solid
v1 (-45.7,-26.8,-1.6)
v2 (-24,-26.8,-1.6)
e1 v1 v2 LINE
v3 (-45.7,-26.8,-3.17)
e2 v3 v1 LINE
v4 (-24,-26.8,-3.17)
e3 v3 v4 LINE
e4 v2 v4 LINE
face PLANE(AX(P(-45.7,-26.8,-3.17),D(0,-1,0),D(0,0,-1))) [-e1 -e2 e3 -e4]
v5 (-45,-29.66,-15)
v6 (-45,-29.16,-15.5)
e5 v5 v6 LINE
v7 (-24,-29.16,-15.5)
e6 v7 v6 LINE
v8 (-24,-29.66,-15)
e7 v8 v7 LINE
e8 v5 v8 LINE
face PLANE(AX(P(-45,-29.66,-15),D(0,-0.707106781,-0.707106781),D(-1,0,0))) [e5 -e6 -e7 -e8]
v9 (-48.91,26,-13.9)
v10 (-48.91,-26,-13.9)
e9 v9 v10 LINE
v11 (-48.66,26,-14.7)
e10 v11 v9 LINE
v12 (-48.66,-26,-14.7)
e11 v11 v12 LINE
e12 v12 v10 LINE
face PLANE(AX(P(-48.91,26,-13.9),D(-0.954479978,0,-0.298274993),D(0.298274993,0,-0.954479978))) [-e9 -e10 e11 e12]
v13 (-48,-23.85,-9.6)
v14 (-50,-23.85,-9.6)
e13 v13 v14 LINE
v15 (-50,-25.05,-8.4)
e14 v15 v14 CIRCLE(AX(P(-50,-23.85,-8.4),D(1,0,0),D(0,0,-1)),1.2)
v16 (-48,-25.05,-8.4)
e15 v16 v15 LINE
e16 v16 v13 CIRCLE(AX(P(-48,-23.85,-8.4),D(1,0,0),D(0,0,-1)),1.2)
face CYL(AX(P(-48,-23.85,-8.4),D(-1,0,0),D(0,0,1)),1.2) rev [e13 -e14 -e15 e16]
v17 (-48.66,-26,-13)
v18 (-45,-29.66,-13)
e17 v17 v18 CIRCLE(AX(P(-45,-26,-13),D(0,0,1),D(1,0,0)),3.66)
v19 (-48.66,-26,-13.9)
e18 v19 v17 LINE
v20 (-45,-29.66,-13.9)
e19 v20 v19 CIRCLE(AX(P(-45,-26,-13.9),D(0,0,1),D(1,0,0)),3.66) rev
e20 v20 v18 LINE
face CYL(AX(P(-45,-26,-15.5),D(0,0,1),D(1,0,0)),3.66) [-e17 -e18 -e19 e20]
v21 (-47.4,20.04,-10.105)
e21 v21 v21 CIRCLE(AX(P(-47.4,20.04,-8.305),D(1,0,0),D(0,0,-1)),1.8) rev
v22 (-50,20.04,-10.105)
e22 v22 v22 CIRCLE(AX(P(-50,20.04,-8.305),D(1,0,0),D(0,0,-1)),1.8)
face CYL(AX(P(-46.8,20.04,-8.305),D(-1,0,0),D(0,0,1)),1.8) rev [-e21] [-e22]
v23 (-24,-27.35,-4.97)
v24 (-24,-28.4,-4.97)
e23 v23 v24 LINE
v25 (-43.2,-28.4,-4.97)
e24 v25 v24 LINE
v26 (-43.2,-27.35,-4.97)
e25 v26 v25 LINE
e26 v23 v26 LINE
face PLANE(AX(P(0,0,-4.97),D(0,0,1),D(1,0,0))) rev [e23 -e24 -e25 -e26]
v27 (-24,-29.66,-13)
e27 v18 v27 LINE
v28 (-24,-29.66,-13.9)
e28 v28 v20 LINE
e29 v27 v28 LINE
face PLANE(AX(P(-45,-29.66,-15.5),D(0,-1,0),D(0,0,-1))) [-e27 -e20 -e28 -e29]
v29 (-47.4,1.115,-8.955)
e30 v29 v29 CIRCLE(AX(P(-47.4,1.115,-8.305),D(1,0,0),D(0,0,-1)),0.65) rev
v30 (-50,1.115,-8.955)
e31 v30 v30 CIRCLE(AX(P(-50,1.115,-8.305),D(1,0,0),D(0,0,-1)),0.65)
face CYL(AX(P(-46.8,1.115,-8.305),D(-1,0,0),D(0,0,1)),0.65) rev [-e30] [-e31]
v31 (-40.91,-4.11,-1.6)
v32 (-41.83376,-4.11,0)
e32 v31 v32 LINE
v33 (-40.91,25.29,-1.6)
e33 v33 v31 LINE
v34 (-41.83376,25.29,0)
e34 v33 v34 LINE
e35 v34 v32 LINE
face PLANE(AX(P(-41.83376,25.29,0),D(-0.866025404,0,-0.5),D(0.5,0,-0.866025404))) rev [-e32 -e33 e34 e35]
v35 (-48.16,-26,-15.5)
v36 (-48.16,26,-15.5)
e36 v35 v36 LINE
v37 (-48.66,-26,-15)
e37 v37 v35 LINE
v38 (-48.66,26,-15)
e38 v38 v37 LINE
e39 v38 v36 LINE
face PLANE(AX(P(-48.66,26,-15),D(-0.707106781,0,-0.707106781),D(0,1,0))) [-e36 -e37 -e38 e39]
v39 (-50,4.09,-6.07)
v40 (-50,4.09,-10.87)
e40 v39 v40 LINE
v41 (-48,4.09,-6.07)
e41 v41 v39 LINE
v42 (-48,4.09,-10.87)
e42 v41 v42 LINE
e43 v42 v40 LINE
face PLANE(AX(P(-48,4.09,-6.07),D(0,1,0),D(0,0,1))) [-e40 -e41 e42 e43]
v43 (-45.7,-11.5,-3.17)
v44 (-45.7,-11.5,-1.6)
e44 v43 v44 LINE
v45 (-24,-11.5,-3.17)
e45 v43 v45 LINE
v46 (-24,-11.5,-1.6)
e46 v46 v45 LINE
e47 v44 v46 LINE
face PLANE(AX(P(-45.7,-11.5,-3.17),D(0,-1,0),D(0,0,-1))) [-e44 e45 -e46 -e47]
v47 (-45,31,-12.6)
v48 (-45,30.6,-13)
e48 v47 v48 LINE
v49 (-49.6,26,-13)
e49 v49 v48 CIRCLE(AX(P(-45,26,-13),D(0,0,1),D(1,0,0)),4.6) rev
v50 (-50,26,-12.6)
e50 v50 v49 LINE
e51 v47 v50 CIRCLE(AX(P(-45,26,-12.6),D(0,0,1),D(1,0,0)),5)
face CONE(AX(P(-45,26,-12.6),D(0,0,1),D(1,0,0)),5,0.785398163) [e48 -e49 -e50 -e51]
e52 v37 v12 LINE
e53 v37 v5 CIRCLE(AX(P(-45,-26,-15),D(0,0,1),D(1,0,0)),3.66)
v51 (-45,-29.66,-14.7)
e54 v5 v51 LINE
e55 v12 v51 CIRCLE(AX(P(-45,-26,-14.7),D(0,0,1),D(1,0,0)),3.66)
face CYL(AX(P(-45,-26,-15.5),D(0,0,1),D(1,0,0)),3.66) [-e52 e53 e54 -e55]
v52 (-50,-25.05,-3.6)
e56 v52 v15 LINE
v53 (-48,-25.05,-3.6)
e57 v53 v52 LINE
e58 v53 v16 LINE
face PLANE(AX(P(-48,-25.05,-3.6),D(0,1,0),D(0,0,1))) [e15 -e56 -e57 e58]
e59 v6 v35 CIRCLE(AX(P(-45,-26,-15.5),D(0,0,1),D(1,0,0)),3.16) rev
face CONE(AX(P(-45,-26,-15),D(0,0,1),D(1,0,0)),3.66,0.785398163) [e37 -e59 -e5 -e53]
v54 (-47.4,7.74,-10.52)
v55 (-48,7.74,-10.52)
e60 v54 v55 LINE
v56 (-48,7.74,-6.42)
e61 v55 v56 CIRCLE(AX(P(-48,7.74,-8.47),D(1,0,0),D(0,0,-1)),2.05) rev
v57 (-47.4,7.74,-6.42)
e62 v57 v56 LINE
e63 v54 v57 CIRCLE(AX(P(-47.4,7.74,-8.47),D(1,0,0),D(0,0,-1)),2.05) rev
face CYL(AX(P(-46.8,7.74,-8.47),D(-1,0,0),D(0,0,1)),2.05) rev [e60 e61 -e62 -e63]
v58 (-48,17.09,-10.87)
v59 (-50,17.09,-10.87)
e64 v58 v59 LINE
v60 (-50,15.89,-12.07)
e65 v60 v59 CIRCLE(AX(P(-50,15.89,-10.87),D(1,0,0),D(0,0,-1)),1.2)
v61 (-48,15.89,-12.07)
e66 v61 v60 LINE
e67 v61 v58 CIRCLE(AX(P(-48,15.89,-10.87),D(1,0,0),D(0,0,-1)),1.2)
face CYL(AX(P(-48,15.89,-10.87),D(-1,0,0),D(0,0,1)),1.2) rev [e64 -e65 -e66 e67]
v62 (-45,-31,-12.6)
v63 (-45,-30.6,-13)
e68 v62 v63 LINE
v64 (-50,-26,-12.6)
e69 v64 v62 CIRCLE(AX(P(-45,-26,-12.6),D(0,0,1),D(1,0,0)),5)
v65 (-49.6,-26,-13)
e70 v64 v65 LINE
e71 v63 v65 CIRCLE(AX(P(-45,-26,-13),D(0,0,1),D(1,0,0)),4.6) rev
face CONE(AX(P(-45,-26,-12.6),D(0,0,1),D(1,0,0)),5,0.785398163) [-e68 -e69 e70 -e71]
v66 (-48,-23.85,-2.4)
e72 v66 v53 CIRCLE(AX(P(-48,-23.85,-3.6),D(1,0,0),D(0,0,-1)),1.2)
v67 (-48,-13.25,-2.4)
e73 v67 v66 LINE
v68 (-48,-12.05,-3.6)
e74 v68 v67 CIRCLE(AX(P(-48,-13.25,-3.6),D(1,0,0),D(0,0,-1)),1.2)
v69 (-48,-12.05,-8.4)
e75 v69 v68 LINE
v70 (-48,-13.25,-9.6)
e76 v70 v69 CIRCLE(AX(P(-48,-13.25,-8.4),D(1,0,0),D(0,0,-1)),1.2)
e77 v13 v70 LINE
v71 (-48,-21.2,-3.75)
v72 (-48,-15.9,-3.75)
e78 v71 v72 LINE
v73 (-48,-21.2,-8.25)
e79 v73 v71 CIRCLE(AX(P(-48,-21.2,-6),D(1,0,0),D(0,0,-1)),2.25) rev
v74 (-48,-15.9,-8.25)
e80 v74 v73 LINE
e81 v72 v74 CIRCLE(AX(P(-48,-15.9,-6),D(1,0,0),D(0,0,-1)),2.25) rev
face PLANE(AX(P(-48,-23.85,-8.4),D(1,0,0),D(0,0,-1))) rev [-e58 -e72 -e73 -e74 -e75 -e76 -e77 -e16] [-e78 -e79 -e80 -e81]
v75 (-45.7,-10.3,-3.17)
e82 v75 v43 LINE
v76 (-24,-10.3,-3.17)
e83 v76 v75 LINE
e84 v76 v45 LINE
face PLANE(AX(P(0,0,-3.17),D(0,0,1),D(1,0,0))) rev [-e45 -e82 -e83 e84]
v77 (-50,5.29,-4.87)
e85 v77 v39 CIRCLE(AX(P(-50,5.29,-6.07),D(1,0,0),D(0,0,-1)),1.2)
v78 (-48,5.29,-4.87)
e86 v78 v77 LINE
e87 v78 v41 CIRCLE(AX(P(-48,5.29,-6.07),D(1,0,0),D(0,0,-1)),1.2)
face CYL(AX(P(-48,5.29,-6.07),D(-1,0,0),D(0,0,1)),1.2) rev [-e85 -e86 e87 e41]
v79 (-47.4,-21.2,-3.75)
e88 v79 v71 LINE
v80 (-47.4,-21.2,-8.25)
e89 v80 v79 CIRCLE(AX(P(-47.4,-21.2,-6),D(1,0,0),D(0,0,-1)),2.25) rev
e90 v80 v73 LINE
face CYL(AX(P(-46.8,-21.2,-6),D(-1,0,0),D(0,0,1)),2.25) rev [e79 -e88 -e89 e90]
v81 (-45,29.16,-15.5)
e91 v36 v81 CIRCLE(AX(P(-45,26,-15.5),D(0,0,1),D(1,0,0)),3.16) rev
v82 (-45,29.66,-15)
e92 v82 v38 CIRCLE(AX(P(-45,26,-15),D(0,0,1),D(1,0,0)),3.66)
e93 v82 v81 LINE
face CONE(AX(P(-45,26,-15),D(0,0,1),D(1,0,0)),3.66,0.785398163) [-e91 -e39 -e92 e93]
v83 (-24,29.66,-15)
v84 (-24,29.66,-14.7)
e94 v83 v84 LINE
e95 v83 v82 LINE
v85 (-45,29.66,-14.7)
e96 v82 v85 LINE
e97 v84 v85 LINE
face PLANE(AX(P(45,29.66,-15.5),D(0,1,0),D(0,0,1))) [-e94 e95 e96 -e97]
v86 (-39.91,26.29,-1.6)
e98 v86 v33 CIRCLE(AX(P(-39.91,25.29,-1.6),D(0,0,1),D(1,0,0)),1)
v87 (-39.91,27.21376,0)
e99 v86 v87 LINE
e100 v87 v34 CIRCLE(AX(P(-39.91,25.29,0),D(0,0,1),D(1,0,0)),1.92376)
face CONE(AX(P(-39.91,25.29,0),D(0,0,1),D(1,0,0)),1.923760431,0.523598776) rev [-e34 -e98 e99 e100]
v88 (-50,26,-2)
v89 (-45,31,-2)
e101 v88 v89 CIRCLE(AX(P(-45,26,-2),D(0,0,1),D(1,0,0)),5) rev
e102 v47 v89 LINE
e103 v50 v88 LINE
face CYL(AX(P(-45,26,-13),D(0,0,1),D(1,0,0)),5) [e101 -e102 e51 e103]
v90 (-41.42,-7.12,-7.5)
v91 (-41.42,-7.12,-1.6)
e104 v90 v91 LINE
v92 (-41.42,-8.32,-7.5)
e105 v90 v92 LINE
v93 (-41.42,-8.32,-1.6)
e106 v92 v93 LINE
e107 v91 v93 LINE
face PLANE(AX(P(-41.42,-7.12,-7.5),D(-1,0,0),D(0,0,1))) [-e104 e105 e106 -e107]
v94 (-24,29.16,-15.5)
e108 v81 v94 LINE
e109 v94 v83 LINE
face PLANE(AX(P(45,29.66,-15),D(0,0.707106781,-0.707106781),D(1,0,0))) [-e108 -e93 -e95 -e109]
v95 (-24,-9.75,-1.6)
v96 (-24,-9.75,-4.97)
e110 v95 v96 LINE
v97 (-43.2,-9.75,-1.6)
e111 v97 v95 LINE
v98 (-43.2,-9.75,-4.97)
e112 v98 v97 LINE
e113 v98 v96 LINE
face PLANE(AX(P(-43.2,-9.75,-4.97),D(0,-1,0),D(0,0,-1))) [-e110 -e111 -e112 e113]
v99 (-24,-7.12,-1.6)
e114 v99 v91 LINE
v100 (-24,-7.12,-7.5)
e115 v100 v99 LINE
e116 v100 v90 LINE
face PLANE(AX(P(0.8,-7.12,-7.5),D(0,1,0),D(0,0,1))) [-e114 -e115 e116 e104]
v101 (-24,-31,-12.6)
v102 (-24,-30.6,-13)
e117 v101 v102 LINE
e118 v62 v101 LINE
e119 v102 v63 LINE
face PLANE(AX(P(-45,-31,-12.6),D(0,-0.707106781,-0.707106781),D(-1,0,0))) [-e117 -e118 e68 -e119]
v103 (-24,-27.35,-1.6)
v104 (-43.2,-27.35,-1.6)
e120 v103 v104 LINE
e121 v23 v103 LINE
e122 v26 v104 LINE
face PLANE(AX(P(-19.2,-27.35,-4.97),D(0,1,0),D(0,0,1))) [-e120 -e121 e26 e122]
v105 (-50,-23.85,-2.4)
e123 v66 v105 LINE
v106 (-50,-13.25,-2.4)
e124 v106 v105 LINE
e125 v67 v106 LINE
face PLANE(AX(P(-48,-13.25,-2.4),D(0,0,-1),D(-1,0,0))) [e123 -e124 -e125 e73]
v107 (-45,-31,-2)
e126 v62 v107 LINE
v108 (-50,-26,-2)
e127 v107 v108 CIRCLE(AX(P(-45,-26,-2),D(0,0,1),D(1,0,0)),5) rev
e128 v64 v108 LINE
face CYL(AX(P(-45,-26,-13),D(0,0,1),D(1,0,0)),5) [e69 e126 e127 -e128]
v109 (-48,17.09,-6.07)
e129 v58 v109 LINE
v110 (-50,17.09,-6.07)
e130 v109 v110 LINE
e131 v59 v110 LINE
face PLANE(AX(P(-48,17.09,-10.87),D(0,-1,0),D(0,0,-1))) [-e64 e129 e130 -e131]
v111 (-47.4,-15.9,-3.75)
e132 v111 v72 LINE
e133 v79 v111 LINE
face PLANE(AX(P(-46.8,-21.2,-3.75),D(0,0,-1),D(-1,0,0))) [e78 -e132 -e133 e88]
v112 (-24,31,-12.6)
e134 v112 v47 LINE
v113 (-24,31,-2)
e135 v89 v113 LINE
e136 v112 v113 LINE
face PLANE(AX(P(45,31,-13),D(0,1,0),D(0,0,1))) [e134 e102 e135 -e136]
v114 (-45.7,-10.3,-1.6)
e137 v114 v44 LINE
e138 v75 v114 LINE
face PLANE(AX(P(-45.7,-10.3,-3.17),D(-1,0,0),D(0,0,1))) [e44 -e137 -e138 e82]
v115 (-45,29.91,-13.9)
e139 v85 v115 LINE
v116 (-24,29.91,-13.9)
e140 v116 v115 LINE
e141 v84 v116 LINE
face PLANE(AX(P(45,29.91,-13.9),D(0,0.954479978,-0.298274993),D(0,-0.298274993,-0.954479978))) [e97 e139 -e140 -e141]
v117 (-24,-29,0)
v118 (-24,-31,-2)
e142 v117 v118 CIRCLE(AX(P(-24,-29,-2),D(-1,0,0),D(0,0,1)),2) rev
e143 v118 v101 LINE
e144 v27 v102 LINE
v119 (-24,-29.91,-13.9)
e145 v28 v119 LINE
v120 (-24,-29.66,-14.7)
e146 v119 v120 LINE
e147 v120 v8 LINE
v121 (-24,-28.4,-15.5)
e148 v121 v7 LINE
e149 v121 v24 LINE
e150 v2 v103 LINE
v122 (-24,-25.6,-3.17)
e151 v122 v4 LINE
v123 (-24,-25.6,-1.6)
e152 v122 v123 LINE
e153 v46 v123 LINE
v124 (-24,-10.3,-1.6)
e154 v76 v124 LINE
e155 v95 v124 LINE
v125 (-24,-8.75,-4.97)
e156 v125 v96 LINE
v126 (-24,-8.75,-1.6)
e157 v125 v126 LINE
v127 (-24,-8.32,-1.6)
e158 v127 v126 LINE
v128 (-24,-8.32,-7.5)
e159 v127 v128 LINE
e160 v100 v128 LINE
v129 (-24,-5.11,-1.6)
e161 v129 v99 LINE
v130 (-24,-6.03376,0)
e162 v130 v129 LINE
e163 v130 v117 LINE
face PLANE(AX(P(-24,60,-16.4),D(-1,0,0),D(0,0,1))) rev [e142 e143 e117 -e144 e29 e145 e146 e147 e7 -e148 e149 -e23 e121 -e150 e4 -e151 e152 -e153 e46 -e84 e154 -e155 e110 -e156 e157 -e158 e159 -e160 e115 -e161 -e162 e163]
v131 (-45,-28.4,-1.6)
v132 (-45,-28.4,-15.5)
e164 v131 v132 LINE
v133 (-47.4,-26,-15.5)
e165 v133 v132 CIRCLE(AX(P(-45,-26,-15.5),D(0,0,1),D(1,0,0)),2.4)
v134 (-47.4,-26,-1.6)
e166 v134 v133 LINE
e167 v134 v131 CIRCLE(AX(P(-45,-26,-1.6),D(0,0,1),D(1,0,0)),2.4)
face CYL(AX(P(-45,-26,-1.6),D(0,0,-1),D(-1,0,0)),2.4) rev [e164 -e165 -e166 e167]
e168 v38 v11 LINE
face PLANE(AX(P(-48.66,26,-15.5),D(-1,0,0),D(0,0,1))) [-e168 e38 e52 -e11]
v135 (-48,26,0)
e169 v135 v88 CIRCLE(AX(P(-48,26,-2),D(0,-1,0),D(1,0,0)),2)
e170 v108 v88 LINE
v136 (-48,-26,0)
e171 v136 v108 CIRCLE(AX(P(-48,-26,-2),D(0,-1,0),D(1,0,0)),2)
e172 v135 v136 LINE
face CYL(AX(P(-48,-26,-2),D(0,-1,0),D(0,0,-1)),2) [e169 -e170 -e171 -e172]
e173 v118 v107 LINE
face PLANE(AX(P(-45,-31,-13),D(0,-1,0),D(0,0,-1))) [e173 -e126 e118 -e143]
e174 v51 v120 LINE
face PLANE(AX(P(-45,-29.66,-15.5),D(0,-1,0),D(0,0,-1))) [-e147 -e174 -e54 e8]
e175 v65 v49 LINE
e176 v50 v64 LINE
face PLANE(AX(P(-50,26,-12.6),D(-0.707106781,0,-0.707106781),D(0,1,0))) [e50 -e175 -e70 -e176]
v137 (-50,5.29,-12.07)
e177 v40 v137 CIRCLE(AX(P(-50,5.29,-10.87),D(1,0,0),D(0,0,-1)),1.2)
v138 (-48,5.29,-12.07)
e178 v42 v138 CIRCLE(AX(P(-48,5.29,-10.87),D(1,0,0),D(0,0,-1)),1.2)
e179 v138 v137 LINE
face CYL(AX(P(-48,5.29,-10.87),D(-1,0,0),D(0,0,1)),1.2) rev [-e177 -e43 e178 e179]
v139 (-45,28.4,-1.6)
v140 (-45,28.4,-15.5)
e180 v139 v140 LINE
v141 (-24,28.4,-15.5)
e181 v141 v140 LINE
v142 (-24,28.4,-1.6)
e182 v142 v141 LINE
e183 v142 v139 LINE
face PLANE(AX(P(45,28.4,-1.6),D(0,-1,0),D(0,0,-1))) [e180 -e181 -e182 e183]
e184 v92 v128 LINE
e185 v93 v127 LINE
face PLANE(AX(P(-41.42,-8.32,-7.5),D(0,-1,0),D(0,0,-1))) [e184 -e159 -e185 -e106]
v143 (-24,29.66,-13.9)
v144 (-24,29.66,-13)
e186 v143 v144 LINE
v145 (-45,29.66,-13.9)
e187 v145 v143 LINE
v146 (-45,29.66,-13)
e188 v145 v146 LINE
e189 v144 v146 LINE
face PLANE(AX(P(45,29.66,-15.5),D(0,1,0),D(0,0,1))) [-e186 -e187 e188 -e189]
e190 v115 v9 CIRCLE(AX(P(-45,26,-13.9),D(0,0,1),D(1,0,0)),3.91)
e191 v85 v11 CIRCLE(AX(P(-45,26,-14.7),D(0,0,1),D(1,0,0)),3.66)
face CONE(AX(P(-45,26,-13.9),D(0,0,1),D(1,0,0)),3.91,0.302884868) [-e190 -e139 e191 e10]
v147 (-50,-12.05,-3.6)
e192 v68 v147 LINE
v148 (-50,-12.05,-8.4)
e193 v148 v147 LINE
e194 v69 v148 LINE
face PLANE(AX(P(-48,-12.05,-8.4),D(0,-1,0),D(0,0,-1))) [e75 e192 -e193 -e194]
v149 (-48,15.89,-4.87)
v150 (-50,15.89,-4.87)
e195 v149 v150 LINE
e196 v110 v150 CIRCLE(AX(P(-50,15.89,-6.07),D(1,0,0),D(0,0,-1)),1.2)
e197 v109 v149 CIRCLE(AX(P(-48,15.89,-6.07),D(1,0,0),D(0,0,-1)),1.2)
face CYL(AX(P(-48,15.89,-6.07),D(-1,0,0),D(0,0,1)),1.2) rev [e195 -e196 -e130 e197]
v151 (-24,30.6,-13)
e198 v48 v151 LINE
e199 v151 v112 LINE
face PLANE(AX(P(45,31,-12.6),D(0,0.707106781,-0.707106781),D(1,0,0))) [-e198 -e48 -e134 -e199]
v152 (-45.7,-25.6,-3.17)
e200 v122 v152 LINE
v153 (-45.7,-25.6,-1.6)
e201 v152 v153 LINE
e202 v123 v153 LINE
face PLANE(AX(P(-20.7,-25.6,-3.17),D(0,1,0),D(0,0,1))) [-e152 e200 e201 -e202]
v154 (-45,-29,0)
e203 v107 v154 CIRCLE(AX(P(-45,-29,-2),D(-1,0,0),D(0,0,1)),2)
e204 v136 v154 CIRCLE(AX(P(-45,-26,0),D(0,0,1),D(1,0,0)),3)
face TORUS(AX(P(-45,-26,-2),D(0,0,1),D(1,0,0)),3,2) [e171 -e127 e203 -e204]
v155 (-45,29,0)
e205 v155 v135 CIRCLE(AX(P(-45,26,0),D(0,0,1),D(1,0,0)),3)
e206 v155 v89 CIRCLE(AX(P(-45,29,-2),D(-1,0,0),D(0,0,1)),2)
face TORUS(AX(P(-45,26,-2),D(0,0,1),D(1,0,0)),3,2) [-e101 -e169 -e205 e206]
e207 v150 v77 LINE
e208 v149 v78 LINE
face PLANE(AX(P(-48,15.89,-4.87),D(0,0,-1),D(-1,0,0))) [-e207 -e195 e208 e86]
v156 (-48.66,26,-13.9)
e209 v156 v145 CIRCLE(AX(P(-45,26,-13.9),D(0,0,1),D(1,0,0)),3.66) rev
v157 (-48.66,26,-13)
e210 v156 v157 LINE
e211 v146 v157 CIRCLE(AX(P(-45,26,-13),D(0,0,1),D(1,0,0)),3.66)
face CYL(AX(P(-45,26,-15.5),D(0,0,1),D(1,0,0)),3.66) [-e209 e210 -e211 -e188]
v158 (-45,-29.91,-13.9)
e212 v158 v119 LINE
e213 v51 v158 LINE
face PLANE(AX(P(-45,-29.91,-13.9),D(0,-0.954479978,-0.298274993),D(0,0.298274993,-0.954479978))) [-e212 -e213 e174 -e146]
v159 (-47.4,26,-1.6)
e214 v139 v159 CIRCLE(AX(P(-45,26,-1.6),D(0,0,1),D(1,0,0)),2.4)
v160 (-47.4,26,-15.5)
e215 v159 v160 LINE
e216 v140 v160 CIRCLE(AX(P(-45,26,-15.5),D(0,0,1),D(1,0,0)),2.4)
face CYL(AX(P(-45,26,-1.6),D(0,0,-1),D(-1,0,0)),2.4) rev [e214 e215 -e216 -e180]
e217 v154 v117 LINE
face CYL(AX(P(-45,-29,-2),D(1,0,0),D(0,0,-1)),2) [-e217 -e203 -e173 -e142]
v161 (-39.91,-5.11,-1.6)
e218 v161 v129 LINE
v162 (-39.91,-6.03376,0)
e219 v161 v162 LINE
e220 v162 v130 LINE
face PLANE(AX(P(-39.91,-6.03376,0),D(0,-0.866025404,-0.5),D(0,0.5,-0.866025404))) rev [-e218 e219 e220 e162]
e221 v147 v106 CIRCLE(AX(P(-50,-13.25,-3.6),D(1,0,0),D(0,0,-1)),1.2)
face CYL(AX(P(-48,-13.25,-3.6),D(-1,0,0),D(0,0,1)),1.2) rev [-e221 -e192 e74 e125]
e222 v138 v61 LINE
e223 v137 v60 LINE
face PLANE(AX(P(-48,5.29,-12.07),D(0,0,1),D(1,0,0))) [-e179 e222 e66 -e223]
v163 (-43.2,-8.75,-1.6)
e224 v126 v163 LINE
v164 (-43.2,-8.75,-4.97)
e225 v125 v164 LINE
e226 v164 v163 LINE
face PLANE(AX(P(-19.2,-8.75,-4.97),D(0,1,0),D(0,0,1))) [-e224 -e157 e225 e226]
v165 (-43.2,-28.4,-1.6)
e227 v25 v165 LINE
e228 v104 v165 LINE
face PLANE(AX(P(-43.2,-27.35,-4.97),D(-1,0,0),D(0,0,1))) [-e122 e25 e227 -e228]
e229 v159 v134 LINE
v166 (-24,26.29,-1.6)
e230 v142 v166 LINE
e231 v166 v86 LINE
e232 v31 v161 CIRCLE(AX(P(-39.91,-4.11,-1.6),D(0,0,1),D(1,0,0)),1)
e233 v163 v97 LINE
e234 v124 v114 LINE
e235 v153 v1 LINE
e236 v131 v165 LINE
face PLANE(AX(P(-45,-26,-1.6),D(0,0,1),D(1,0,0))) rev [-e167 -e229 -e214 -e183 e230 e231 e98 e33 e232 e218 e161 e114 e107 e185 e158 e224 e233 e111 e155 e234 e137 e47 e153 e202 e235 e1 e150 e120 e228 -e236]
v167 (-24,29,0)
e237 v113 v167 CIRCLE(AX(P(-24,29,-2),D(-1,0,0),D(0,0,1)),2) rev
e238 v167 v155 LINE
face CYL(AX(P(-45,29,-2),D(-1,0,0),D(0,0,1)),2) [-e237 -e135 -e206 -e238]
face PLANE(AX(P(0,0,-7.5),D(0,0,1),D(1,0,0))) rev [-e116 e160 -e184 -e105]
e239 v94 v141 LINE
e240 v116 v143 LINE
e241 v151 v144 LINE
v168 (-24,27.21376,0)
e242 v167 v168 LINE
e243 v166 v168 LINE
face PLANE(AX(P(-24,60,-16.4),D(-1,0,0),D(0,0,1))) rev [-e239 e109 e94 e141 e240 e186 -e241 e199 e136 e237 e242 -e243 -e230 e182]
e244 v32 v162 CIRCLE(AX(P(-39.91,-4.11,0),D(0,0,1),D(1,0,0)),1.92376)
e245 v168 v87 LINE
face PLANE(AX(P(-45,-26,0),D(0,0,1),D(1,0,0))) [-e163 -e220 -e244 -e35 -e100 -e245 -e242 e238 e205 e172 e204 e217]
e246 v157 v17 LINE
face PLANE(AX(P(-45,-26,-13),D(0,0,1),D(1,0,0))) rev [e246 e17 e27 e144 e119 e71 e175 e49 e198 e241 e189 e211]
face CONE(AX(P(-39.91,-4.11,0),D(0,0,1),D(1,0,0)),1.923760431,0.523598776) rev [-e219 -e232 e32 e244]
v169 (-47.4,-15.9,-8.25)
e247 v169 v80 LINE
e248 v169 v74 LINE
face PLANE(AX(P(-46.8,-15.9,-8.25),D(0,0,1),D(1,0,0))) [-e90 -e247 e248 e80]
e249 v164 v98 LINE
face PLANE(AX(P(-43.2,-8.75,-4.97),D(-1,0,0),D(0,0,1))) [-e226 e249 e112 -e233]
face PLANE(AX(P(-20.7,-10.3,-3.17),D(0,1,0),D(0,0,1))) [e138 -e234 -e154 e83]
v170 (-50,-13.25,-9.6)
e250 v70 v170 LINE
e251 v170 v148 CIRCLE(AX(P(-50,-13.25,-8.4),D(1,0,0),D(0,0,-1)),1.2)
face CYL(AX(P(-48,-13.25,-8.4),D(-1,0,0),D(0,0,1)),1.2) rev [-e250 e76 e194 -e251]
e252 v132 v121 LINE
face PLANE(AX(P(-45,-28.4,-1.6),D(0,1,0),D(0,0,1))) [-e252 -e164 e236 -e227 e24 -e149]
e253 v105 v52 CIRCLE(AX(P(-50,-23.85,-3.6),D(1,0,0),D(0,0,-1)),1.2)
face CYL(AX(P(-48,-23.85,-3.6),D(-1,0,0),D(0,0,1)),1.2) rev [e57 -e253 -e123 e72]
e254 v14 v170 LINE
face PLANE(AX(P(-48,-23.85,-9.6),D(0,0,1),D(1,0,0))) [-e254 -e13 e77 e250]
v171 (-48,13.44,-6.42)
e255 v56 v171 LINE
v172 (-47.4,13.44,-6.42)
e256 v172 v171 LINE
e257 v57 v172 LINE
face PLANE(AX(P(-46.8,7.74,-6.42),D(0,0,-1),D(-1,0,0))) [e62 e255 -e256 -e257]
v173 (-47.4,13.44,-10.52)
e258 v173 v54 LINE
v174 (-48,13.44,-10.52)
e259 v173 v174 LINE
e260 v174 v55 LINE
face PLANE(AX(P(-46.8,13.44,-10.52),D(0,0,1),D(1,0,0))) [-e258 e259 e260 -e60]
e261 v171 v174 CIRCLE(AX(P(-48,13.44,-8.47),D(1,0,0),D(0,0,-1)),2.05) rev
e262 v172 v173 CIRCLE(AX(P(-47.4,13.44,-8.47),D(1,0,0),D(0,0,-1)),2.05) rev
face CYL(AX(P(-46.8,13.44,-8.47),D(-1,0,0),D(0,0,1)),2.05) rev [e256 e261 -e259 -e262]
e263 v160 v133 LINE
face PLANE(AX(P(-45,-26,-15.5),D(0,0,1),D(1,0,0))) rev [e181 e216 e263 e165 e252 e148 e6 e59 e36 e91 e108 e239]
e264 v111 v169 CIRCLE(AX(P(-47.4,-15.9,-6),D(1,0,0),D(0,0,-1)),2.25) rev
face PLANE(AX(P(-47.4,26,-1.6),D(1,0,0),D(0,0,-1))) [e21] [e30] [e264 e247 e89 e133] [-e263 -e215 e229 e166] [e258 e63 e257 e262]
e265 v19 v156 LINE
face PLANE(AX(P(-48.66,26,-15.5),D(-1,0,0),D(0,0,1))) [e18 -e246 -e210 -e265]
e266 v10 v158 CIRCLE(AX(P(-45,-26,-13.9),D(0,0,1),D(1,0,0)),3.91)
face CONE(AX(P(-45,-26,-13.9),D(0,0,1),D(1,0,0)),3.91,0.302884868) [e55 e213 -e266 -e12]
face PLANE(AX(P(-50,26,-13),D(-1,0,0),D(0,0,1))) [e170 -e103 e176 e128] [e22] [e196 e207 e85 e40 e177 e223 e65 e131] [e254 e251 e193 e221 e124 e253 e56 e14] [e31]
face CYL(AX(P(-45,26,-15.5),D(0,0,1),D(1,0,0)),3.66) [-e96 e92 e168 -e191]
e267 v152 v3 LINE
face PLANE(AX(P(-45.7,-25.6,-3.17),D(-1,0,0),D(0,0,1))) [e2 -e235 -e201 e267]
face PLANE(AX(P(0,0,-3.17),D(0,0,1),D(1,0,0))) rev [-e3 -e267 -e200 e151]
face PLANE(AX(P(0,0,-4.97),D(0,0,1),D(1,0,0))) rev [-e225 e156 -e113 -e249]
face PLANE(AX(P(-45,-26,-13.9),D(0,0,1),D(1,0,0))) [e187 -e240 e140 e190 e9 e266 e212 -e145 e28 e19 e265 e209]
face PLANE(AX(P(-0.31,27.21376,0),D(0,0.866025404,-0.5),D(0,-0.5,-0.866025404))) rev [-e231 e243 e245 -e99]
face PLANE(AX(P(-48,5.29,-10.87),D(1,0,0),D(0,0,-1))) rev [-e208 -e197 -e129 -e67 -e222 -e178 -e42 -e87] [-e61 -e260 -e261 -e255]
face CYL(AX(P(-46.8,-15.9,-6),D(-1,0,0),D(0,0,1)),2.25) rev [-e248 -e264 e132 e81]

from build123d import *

# Parameters (mm, degrees)
BODY_DEPTH              = 13
ROUND_FRONT_R           = 2
CAVITY_DEPTH            = 11.4
LIP_START               = -2.5
LIP_DEPTH               = 2.5
LIP_CHAMFER_SIZE        = 0.5
BEAD_DEPTH              = 0.8
BEAD_DRAFT              = -17.354024636
SCREEN_WINDOW_DEPTH     = 1.9
SCREEN_WINDOW_DRAFT     = -30
BOARD_FENCE_SK6_W       = 1.2
BOARD_FENCE_SK6_H       = 31.02
BOARD_FENCE_SK6_W_2     = 42.22
BOARD_FENCE_SK6_H_2     = 1.2
BOARD_FENCE_DEPTH       = 5.9
TP_RAILS_SK7_W          = 25
TP_RAILS_SK7_H          = 1.2
TP_RAILS_DEPTH          = 1.57
TP_FENCE_SK8_W          = 24
TP_FENCE_SK8_H          = 1
TP_FENCE_SK8_W_2        = 1
TP_FENCE_SK8_H_2        = 15.3
TP_FENCE_SK8_H_3        = 1.05
TP_FENCE_DEPTH          = 3.37
CELL_RIBS_SK9_W         = 1.2
CELL_RIBS_SK9_H         = 12
CELL_RIBS_DEPTH         = 9.05
MAX_RELIEF_DEPTH        = 0.9
MAX_WINDOW_DEPTH        = 1.8
MAX_WINDOW_CHAMFER_SIZE = 1
MAX_LEDGES_SK12_W       = 1.6
MAX_LEDGES_SK12_H       = 1.6
MAX_LEDGES_DEPTH        = 1.3
MAX_FENCE_DEPTH         = 2.6
USB_RECESS_DEPTH        = 2
LEFT_PORTS_SK15_R       = 1.8
LEFT_PORTS_SK15_R_2     = 0.65
LEFT_PORTS_DEPTH        = 3.2
BUZZER_KEEPER_SK16_W    = 1.2
BUZZER_KEEPER_SK16_H    = 8
BUZZER_KEEPER_DEPTH     = 14.8
MIC_KEEPER_SK17_W       = 6
MIC_KEEPER_SK17_H       = 1.2
MIC_KEEPER_DEPTH        = 13.5
SEAM_SHADOW_SIZE        = 0.4
PRY_NOTCH_SK18_W        = 8
PRY_NOTCH_SK18_H        = 1.8
PRY_NOTCH_DEPTH         = 1.2
FITTEST_TRIM_DEPTH      = 62.073398464
FITTEST_TRIM_DEPTH_BACK = 62.073398464
FITTEST_SK_W            = 120
FITTEST_SK_H            = 120


with BuildPart() as part:
    # Body_Sk1 → Body (new body)
    with BuildSketch(Plane.XY):
        with BuildLine():
            Line((-45, -31), (45, -31))
            ThreePointArc((45, -31), (48.535533906, -29.535533906), (50, -26))
            Line((50, -26), (50, 26))
            ThreePointArc((50, 26), (48.535533906, 29.535533906), (45, 31))
            Line((45, 31), (-45, 31))
            ThreePointArc((-45, 31), (-48.535533906, 29.535533906), (-50, 26))
            Line((-50, 26), (-50, -26))
            ThreePointArc((-50, -26), (-48.535533906, -29.535533906), (-45, -31))
        make_face()
    extrude(amount=-BODY_DEPTH)

    # Round_Front
    round_front_edges = [part.edges().sort_by_distance(p)[0] for p in [
        (50, 0, 0),
        (48.535533906, -29.535533906, 0),
        (0, -31, 0),
        (-48.535533906, -29.535533906, 0),
        (-50, 0, 0),
        (-48.535533906, 29.535533906, 0),
        (0, 31, 0),
        (48.535533906, 29.535533906, 0),
    ]]
    fillet(round_front_edges, radius=ROUND_FRONT_R)

    # Cavity_Sk2 → Cavity (cut)
    with BuildSketch(Plane.XY.offset(-13)):
        with BuildLine():
            Line((-45, -28.4), (45, -28.4))
            ThreePointArc((45, -28.4), (46.697056275, -27.697056275), (47.4, -26))
            Line((47.4, -26), (47.4, 26))
            ThreePointArc((47.4, 26), (46.697056275, 27.697056275), (45, 28.4))
            Line((45, 28.4), (-45, 28.4))
            ThreePointArc((-45, 28.4), (-46.697056275, 27.697056275), (-47.4, 26))
            Line((-47.4, 26), (-47.4, -26))
            ThreePointArc((-47.4, -26), (-46.697056275, -27.697056275), (-45, -28.4))
        make_face()
    extrude(amount=CAVITY_DEPTH, mode=Mode.SUBTRACT)

    # Lip_Sk3 → Lip (add)
    with BuildSketch(Plane.XY.offset(-13).offset(LIP_START)):
        with BuildLine():
            Line((-45, -29.66), (45, -29.66))
            ThreePointArc((45, -29.66), (47.588010819, -28.588010819), (48.66, -26))
            Line((48.66, -26), (48.66, 26))
            ThreePointArc((48.66, 26), (47.588010819, 28.588010819), (45, 29.66))
            Line((45, 29.66), (-45, 29.66))
            ThreePointArc((-45, 29.66), (-47.588010819, 28.588010819), (-48.66, 26))
            Line((-48.66, 26), (-48.66, -26))
            ThreePointArc((-48.66, -26), (-47.588010819, -28.588010819), (-45, -29.66))
        make_face()
        with BuildLine():
            Line((-45, -28.4), (45, -28.4))
            ThreePointArc((45, -28.4), (46.697056275, -27.697056275), (47.4, -26))
            Line((47.4, -26), (47.4, 26))
            ThreePointArc((47.4, 26), (46.697056275, 27.697056275), (45, 28.4))
            Line((45, 28.4), (-45, 28.4))
            ThreePointArc((-45, 28.4), (-46.697056275, 27.697056275), (-47.4, 26))
            Line((-47.4, 26), (-47.4, -26))
            ThreePointArc((-47.4, -26), (-46.697056275, -27.697056275), (-45, -28.4))
        make_face(mode=Mode.SUBTRACT)
    extrude(amount=LIP_DEPTH)

    # Lip_Chamfer
    lip_chamfer_edges = [part.edges().sort_by_distance(p)[0] for p in [
        (-47.588010819, -28.588010819, -15.5),
        (-48.66, 0, -15.5),
        (-47.588010819, 28.588010819, -15.5),
        (0, 29.66, -15.5),
        (47.588010819, 28.588010819, -15.5),
        (48.66, 0, -15.5),
        (47.588010819, -28.588010819, -15.5),
        (0, -29.66, -15.5),
    ]]
    chamfer(lip_chamfer_edges, length=LIP_CHAMFER_SIZE)


with BuildPart() as bead_tool:
    # Bead_Sk4 → Bead (with draft: the straight prism first)
    with BuildSketch(Plane.XY.offset(-13.9)):
        with BuildLine():
            Line((-45, -29.91), (45, -29.91))
            ThreePointArc((45, -29.91), (47.764787514, -28.764787514), (48.91, -26))
            Line((48.91, -26), (48.91, 26))
            ThreePointArc((48.91, 26), (47.764787514, 28.764787514), (45, 29.91))
            Line((45, 29.91), (-45, 29.91))
            ThreePointArc((-45, 29.91), (-47.764787514, 28.764787514), (-48.91, 26))
            Line((-48.91, 26), (-48.91, -26))
            ThreePointArc((-48.91, -26), (-47.764787514, -28.764787514), (-45, -29.91))
        make_face()
        with BuildLine():
            Line((-45, -29.06), (45, -29.06))
            ThreePointArc((45, -29.06), (47.16374675, -28.16374675), (48.06, -26))
            Line((48.06, -26), (48.06, 26))
            ThreePointArc((48.06, 26), (47.16374675, 28.16374675), (45, 29.06))
            Line((45, 29.06), (-45, 29.06))
            ThreePointArc((-45, 29.06), (-47.16374675, 28.16374675), (-48.06, 26))
            Line((-48.06, 26), (-48.06, -26))
            ThreePointArc((-48.06, -26), (-47.16374675, -28.16374675), (-45, -29.06))
        make_face(mode=Mode.SUBTRACT)
    extrude(amount=-BEAD_DEPTH)
    # Bead: the draft: its side faces are tilted about the plane it starts from
    bead_sides = [bead_tool.faces().sort_by_distance(p)[0] for p in [
        (0, -29.91, -14.3),
        (47.764787514, -28.764787514, -14.3),
        (48.91, 0, -14.3),
        (47.764787514, 28.764787514, -14.3),
        (0, 29.91, -14.3),
        (-47.764787514, 28.764787514, -14.3),
        (-48.91, 0, -14.3),
        (-47.764787514, -28.764787514, -14.3),
        (-47.16374675, -28.16374675, -14.3),
        (-48.06, 0, -14.3),
        (-47.16374675, 28.16374675, -14.3),
        (0, 29.06, -14.3),
        (47.16374675, 28.16374675, -14.3),
        (48.06, 0, -14.3),
        (47.16374675, -28.16374675, -14.3),
        (0, -29.06, -14.3),
    ]]
    draft(bead_sides, Plane.XY.offset(-13.9), BEAD_DRAFT)


with BuildPart() as part_1:
    add(part.part)

    # Bead: add bead_tool
    add(bead_tool.part)


with BuildPart() as screen_window_tool:
    # Screen_Window_Sk5 → Screen_Window (with draft: the straight prism first)
    with BuildSketch(Plane.XY):
        with BuildLine():
            Line((-39.91, -6.033760431), (-0.31, -6.033760431))
            ThreePointArc((-0.31, -6.033760431), (1.050304046, -5.470304046), (1.613760431, -4.11))
            Line((1.613760431, -4.11), (1.613760431, 25.29))
            ThreePointArc((1.613760431, 25.29), (1.050304046, 26.650304046), (-0.31, 27.213760431))
            Line((-0.31, 27.213760431), (-39.91, 27.213760431))
            ThreePointArc((-39.91, 27.213760431), (-41.270304046, 26.650304046), (-41.833760431, 25.29))
            Line((-41.833760431, 25.29), (-41.833760431, -4.11))
            ThreePointArc((-41.833760431, -4.11), (-41.270304046, -5.470304046), (-39.91, -6.033760431))
        make_face()
    extrude(amount=-SCREEN_WINDOW_DEPTH)
    # Screen_Window: the draft: its side faces are tilted about the plane it starts from
    screen_window_sides = [screen_window_tool.faces().sort_by_distance(p)[0] for p in [
        (-20.11, -6.033760431, -0.95),
        (1.050304046, -5.470304046, -0.95),
        (1.613760431, 10.59, -0.95),
        (1.050304046, 26.650304046, -0.95),
        (-20.11, 27.213760431, -0.95),
        (-41.270304046, 26.650304046, -0.95),
        (-41.833760431, 10.59, -0.95),
        (-41.270304046, -5.470304046, -0.95),
    ]]
    draft(screen_window_sides, Plane.XY, SCREEN_WINDOW_DRAFT)


with BuildPart() as part_2:
    add(part_1.part)

    # Screen_Window: cut by screen_window_tool
    add(screen_window_tool.part, mode=Mode.SUBTRACT)

    # Board_Fence_Sk6 → Board_Fence (add)
    with BuildSketch(Plane.XY.offset(-1.6)):
        with Locations((3.1, 11.59)):
            Rectangle(BOARD_FENCE_SK6_W, BOARD_FENCE_SK6_H)
        with Locations((-20.31, -7.72)):
            Rectangle(BOARD_FENCE_SK6_W_2, BOARD_FENCE_SK6_H_2)
    extrude(amount=-BOARD_FENCE_DEPTH)

    # TP_Rails_Sk7 → TP_Rails (add)
    with BuildSketch(Plane.XY.offset(-1.6)):
        with Locations((-33.2, -26.2)):
            Rectangle(TP_RAILS_SK7_W, TP_RAILS_SK7_H)
        with Locations((-33.2, -10.9)):
            Rectangle(TP_RAILS_SK7_W, TP_RAILS_SK7_H)
    extrude(amount=-TP_RAILS_DEPTH)

    # TP_Fence_Sk8 → TP_Fence (add)
    with BuildSketch(Plane.XY.offset(-1.6)):
        with Locations((-31.2, -9.25)):
            Rectangle(TP_FENCE_SK8_W, TP_FENCE_SK8_H)
        with Locations((-18.4, -18.55)):
            Rectangle(TP_FENCE_SK8_W_2, TP_FENCE_SK8_H_2)
        with Locations((-31.2, -27.875)):
            Rectangle(TP_FENCE_SK8_W, TP_FENCE_SK8_H_3)
    extrude(amount=-TP_FENCE_DEPTH)

    # Cell_Ribs_Sk9 → Cell_Ribs (add)
    with BuildSketch(Plane.XY.offset(-1.6)):
        with Locations((-10, -18.05)):
            Rectangle(CELL_RIBS_SK9_W, CELL_RIBS_SK9_H)
        with Locations((8, -18.05)):
            Rectangle(CELL_RIBS_SK9_W, CELL_RIBS_SK9_H)
        with Locations((22, -18.05)):
            Rectangle(CELL_RIBS_SK9_W, CELL_RIBS_SK9_H)
    extrude(amount=-CELL_RIBS_DEPTH)

    # MAX_Relief_Sk10 → MAX_Relief (cut)
    with BuildSketch(Plane.XY.offset(-1.6)):
        with BuildLine():
            Line((20.35, 3.85), (37.65, 3.85))
            ThreePointArc((37.65, 3.85), (38.357106781, 4.142893219), (38.65, 4.85))
            Line((38.65, 4.85), (38.65, 17.15))
            ThreePointArc((38.65, 17.15), (38.357106781, 17.857106781), (37.65, 18.15))
            Line((37.65, 18.15), (20.35, 18.15))
            ThreePointArc((20.35, 18.15), (19.642893219, 17.857106781), (19.35, 17.15))
            Line((19.35, 17.15), (19.35, 4.85))
            ThreePointArc((19.35, 4.85), (19.642893219, 4.142893219), (20.35, 3.85))
        make_face()
    extrude(amount=MAX_RELIEF_DEPTH, mode=Mode.SUBTRACT)

    # MAX_Window_Sk11 → MAX_Window (cut)
    with BuildSketch(Plane.XY):
        with BuildLine():
            Line((26, 7), (32, 7))
            ThreePointArc((32, 7), (33.414213562, 7.585786438), (34, 9))
            Line((34, 9), (34, 13))
            ThreePointArc((34, 13), (33.414213562, 14.414213562), (32, 15))
            Line((32, 15), (26, 15))
            ThreePointArc((26, 15), (24.585786438, 14.414213562), (24, 13))
            Line((24, 13), (24, 9))
            ThreePointArc((24, 9), (24.585786438, 7.585786438), (26, 7))
        make_face()
    extrude(amount=-MAX_WINDOW_DEPTH, mode=Mode.SUBTRACT)

    # MAX_Window_Chamfer
    # the kernel refuses this chamfer: 1 mm, written as the material it takes off along each edge
    with BuildSketch(Plane(origin=(26, 9, 0), x_dir=(-1, 0, 0), z_dir=(0, 1, 0))) as max_window_chamfer_piece_1:
        Polygon((2 + MAX_WINDOW_CHAMFER_SIZE, 0), (2, -MAX_WINDOW_CHAMFER_SIZE), (2, 0), align=None)
    revolve(axis=Axis((26, 9, 0), (0, 0, 1)), revolution_arc=90, mode=Mode.SUBTRACT)
    with BuildSketch(Plane(origin=(26, 7, 0), x_dir=(0, -0.9996219169112968, 0.027495876610586365), z_dir=(1, 0, 0)), Plane(origin=(32, 15, 0), x_dir=(0, 0.9996219169112968, 0.02749587661058639), z_dir=(-1, 0, 0))) as max_window_chamfer_piece_2:
        Polygon((MAX_WINDOW_CHAMFER_SIZE * 0.999621916911, MAX_WINDOW_CHAMFER_SIZE * 0.0274958766106), (-MAX_WINDOW_CHAMFER_SIZE * 0.0274958766106, MAX_WINDOW_CHAMFER_SIZE * 0.999621916911), (0, 0), align=None)
    extrude(amount=6, mode=Mode.SUBTRACT)
    with BuildSketch(Plane(origin=(32, 9, 0), x_dir=(0, -1, 0), z_dir=(-1, 0, 0))) as max_window_chamfer_piece_3:
        Polygon((2 + MAX_WINDOW_CHAMFER_SIZE, 0), (2, -MAX_WINDOW_CHAMFER_SIZE), (2, 0), align=None)
    revolve(axis=Axis((32, 9, 0), (0, 0, 1)), revolution_arc=90, mode=Mode.SUBTRACT)
    with BuildSketch(Plane(origin=(34, 9, 0), x_dir=(0.9996219169112968, 0, 0.027495876610586292), z_dir=(0, 1, 0)), Plane(origin=(24, 13, 0), x_dir=(-0.9996219169112968, 0, 0.02749587661058639), z_dir=(0, -1, 0))) as max_window_chamfer_piece_4:
        Polygon((MAX_WINDOW_CHAMFER_SIZE * 0.999621916911, MAX_WINDOW_CHAMFER_SIZE * 0.0274958766106), (-MAX_WINDOW_CHAMFER_SIZE * 0.0274958766106, MAX_WINDOW_CHAMFER_SIZE * 0.999621916911), (0, 0), align=None)
    extrude(amount=4, mode=Mode.SUBTRACT)
    with BuildSketch(Plane(origin=(32, 13, 0), x_dir=(1, 0, 0), z_dir=(0, -1, 0))) as max_window_chamfer_piece_5:
        Polygon((2 + MAX_WINDOW_CHAMFER_SIZE, 0), (2, -MAX_WINDOW_CHAMFER_SIZE), (2, 0), align=None)
    revolve(axis=Axis((32, 13, 0), (0, 0, 1)), revolution_arc=90, mode=Mode.SUBTRACT)
    with BuildSketch(Plane(origin=(26, 13, 0), x_dir=(0, 1, 0), z_dir=(1, 0, 0))) as max_window_chamfer_piece_6:
        Polygon((2 + MAX_WINDOW_CHAMFER_SIZE, 0), (2, -MAX_WINDOW_CHAMFER_SIZE), (2, 0), align=None)
    revolve(axis=Axis((26, 13, 0), (0, 0, 1)), revolution_arc=90, mode=Mode.SUBTRACT)

    # MAX_Ledges_Sk12 → MAX_Ledges (add)
    with BuildSketch(Plane.XY.offset(-0.7)):
        with Locations((19.45, 3.95)):
            Rectangle(MAX_LEDGES_SK12_W, MAX_LEDGES_SK12_H)
        with Locations((19.45, 18.05)):
            Rectangle(MAX_LEDGES_SK12_W, MAX_LEDGES_SK12_H)
        with Locations((38.55, 3.95)):
            Rectangle(MAX_LEDGES_SK12_W, MAX_LEDGES_SK12_H)
        with Locations((38.55, 18.05)):
            Rectangle(MAX_LEDGES_SK12_W, MAX_LEDGES_SK12_H)
    extrude(amount=-MAX_LEDGES_DEPTH)

    # MAX_Fence_Sk13 → MAX_Fence (add)
    with BuildSketch(Plane.XY.offset(-1.6)):
        Polygon((17.45, 20.05), (37.35, 20.05), (37.35, 18.85), (18.65, 18.85), (18.65, 3.15), (37.35, 3.15), (37.35, 1.95), (17.45, 1.95), align=None)
    extrude(amount=-MAX_FENCE_DEPTH)

    # USB_Recess_Sk14 → USB_Recess (cut)
    with BuildSketch(Plane(origin=(-50, 0, 0), x_dir=(0, 0, -1), z_dir=(1, 0, 0))):
        with BuildLine():
            Line((12.07, 5.29), (12.07, 15.89))
            ThreePointArc((12.07, 15.89), (11.718528137, 16.738528137), (10.87, 17.09))
            Line((10.87, 17.09), (6.07, 17.09))
            ThreePointArc((6.07, 17.09), (5.221471863, 16.738528137), (4.87, 15.89))
            Line((4.87, 15.89), (4.87, 5.29))
            ThreePointArc((4.87, 5.29), (5.221471863, 4.441471863), (6.07, 4.09))
            Line((6.07, 4.09), (10.87, 4.09))
            ThreePointArc((10.87, 4.09), (11.718528137, 4.441471863), (12.07, 5.29))
        make_face()
        with BuildLine():
            Line((9.6, -23.85), (9.6, -13.25))
            ThreePointArc((9.6, -13.25), (9.248528137, -12.401471863), (8.4, -12.05))
            Line((8.4, -12.05), (3.6, -12.05))
            ThreePointArc((3.6, -12.05), (2.751471863, -12.401471863), (2.4, -13.25))
            Line((2.4, -13.25), (2.4, -23.85))
            ThreePointArc((2.4, -23.85), (2.751471863, -24.698528137), (3.6, -25.05))
            Line((3.6, -25.05), (8.4, -25.05))
            ThreePointArc((8.4, -25.05), (9.248528137, -24.698528137), (9.6, -23.85))
        make_face()
    extrude(amount=USB_RECESS_DEPTH, mode=Mode.SUBTRACT)

    # Left_Ports_Sk15 → Left_Ports (cut)
    with BuildSketch(Plane(origin=(-50, 0, 0), x_dir=(0, 0, -1), z_dir=(1, 0, 0))):
        with Locations((8.305, 20.04)):
            Circle(LEFT_PORTS_SK15_R)
        with Locations((8.305, 1.115)):
            Circle(LEFT_PORTS_SK15_R_2)
        with BuildLine():
            Line((6.42, 7.74), (6.42, 13.44))
            ThreePointArc((6.42, 13.44), (8.47, 15.49), (10.52, 13.44))
            Line((10.52, 13.44), (10.52, 7.74))
            ThreePointArc((10.52, 7.74), (8.47, 5.69), (6.42, 7.74))
        make_face()
        with BuildLine():
            Line((3.75, -21.2), (3.75, -15.9))
            ThreePointArc((3.75, -15.9), (6, -13.65), (8.25, -15.9))
            Line((8.25, -15.9), (8.25, -21.2))
            ThreePointArc((8.25, -21.2), (6, -23.45), (3.75, -21.2))
        make_face()
    extrude(amount=LEFT_PORTS_DEPTH, mode=Mode.SUBTRACT)

    # Buzzer_Keeper_Sk16 → Buzzer_Keeper (add)
    with BuildSketch(Plane.XY.offset(-1.6)):
        with Locations((44.9, -18)):
            Rectangle(BUZZER_KEEPER_SK16_W, BUZZER_KEEPER_SK16_H)
    extrude(amount=-BUZZER_KEEPER_DEPTH)

    # Mic_Keeper_Sk17 → Mic_Keeper (add)
    with BuildSketch(Plane.XY.offset(-1.6)):
        with Locations((16, 27.8)):
            Rectangle(MIC_KEEPER_SK17_W, MIC_KEEPER_SK17_H)
    extrude(amount=-MIC_KEEPER_DEPTH)

    # Seam_Shadow
    seam_shadow_edges = [part_2.edges().sort_by_distance(p)[0] for p in [
        (48.535533906, -29.535533906, -13),
        (50, 0, -13),
        (48.535533906, 29.535533906, -13),
        (0, 31, -13),
        (-48.535533906, 29.535533906, -13),
        (-50, 0, -13),
        (-48.535533906, -29.535533906, -13),
        (0, -31, -13),
    ]]
    chamfer(seam_shadow_edges, length=SEAM_SHADOW_SIZE)

    # Pry_Notch_Sk18 → Pry_Notch (cut)
    with BuildSketch(Plane(origin=(0, -31, 0), x_dir=(1, 0, 0), z_dir=(0, 1, 0))):
        with Locations((38, 12.1)):
            Rectangle(PRY_NOTCH_SK18_W, PRY_NOTCH_SK18_H)
    extrude(amount=PRY_NOTCH_DEPTH, mode=Mode.SUBTRACT)

    # FitTest_Sk → FitTest_Trim (cut, two sides: drawn at the far end of the back side and taken through both)
    with BuildSketch(Plane.XY.offset(-FITTEST_TRIM_DEPTH_BACK)):
        with Locations((36, 0)):
            Rectangle(FITTEST_SK_W, FITTEST_SK_H)
    extrude(amount=FITTEST_TRIM_DEPTH + FITTEST_TRIM_DEPTH_BACK, mode=Mode.SUBTRACT)


solid = part_2.part
